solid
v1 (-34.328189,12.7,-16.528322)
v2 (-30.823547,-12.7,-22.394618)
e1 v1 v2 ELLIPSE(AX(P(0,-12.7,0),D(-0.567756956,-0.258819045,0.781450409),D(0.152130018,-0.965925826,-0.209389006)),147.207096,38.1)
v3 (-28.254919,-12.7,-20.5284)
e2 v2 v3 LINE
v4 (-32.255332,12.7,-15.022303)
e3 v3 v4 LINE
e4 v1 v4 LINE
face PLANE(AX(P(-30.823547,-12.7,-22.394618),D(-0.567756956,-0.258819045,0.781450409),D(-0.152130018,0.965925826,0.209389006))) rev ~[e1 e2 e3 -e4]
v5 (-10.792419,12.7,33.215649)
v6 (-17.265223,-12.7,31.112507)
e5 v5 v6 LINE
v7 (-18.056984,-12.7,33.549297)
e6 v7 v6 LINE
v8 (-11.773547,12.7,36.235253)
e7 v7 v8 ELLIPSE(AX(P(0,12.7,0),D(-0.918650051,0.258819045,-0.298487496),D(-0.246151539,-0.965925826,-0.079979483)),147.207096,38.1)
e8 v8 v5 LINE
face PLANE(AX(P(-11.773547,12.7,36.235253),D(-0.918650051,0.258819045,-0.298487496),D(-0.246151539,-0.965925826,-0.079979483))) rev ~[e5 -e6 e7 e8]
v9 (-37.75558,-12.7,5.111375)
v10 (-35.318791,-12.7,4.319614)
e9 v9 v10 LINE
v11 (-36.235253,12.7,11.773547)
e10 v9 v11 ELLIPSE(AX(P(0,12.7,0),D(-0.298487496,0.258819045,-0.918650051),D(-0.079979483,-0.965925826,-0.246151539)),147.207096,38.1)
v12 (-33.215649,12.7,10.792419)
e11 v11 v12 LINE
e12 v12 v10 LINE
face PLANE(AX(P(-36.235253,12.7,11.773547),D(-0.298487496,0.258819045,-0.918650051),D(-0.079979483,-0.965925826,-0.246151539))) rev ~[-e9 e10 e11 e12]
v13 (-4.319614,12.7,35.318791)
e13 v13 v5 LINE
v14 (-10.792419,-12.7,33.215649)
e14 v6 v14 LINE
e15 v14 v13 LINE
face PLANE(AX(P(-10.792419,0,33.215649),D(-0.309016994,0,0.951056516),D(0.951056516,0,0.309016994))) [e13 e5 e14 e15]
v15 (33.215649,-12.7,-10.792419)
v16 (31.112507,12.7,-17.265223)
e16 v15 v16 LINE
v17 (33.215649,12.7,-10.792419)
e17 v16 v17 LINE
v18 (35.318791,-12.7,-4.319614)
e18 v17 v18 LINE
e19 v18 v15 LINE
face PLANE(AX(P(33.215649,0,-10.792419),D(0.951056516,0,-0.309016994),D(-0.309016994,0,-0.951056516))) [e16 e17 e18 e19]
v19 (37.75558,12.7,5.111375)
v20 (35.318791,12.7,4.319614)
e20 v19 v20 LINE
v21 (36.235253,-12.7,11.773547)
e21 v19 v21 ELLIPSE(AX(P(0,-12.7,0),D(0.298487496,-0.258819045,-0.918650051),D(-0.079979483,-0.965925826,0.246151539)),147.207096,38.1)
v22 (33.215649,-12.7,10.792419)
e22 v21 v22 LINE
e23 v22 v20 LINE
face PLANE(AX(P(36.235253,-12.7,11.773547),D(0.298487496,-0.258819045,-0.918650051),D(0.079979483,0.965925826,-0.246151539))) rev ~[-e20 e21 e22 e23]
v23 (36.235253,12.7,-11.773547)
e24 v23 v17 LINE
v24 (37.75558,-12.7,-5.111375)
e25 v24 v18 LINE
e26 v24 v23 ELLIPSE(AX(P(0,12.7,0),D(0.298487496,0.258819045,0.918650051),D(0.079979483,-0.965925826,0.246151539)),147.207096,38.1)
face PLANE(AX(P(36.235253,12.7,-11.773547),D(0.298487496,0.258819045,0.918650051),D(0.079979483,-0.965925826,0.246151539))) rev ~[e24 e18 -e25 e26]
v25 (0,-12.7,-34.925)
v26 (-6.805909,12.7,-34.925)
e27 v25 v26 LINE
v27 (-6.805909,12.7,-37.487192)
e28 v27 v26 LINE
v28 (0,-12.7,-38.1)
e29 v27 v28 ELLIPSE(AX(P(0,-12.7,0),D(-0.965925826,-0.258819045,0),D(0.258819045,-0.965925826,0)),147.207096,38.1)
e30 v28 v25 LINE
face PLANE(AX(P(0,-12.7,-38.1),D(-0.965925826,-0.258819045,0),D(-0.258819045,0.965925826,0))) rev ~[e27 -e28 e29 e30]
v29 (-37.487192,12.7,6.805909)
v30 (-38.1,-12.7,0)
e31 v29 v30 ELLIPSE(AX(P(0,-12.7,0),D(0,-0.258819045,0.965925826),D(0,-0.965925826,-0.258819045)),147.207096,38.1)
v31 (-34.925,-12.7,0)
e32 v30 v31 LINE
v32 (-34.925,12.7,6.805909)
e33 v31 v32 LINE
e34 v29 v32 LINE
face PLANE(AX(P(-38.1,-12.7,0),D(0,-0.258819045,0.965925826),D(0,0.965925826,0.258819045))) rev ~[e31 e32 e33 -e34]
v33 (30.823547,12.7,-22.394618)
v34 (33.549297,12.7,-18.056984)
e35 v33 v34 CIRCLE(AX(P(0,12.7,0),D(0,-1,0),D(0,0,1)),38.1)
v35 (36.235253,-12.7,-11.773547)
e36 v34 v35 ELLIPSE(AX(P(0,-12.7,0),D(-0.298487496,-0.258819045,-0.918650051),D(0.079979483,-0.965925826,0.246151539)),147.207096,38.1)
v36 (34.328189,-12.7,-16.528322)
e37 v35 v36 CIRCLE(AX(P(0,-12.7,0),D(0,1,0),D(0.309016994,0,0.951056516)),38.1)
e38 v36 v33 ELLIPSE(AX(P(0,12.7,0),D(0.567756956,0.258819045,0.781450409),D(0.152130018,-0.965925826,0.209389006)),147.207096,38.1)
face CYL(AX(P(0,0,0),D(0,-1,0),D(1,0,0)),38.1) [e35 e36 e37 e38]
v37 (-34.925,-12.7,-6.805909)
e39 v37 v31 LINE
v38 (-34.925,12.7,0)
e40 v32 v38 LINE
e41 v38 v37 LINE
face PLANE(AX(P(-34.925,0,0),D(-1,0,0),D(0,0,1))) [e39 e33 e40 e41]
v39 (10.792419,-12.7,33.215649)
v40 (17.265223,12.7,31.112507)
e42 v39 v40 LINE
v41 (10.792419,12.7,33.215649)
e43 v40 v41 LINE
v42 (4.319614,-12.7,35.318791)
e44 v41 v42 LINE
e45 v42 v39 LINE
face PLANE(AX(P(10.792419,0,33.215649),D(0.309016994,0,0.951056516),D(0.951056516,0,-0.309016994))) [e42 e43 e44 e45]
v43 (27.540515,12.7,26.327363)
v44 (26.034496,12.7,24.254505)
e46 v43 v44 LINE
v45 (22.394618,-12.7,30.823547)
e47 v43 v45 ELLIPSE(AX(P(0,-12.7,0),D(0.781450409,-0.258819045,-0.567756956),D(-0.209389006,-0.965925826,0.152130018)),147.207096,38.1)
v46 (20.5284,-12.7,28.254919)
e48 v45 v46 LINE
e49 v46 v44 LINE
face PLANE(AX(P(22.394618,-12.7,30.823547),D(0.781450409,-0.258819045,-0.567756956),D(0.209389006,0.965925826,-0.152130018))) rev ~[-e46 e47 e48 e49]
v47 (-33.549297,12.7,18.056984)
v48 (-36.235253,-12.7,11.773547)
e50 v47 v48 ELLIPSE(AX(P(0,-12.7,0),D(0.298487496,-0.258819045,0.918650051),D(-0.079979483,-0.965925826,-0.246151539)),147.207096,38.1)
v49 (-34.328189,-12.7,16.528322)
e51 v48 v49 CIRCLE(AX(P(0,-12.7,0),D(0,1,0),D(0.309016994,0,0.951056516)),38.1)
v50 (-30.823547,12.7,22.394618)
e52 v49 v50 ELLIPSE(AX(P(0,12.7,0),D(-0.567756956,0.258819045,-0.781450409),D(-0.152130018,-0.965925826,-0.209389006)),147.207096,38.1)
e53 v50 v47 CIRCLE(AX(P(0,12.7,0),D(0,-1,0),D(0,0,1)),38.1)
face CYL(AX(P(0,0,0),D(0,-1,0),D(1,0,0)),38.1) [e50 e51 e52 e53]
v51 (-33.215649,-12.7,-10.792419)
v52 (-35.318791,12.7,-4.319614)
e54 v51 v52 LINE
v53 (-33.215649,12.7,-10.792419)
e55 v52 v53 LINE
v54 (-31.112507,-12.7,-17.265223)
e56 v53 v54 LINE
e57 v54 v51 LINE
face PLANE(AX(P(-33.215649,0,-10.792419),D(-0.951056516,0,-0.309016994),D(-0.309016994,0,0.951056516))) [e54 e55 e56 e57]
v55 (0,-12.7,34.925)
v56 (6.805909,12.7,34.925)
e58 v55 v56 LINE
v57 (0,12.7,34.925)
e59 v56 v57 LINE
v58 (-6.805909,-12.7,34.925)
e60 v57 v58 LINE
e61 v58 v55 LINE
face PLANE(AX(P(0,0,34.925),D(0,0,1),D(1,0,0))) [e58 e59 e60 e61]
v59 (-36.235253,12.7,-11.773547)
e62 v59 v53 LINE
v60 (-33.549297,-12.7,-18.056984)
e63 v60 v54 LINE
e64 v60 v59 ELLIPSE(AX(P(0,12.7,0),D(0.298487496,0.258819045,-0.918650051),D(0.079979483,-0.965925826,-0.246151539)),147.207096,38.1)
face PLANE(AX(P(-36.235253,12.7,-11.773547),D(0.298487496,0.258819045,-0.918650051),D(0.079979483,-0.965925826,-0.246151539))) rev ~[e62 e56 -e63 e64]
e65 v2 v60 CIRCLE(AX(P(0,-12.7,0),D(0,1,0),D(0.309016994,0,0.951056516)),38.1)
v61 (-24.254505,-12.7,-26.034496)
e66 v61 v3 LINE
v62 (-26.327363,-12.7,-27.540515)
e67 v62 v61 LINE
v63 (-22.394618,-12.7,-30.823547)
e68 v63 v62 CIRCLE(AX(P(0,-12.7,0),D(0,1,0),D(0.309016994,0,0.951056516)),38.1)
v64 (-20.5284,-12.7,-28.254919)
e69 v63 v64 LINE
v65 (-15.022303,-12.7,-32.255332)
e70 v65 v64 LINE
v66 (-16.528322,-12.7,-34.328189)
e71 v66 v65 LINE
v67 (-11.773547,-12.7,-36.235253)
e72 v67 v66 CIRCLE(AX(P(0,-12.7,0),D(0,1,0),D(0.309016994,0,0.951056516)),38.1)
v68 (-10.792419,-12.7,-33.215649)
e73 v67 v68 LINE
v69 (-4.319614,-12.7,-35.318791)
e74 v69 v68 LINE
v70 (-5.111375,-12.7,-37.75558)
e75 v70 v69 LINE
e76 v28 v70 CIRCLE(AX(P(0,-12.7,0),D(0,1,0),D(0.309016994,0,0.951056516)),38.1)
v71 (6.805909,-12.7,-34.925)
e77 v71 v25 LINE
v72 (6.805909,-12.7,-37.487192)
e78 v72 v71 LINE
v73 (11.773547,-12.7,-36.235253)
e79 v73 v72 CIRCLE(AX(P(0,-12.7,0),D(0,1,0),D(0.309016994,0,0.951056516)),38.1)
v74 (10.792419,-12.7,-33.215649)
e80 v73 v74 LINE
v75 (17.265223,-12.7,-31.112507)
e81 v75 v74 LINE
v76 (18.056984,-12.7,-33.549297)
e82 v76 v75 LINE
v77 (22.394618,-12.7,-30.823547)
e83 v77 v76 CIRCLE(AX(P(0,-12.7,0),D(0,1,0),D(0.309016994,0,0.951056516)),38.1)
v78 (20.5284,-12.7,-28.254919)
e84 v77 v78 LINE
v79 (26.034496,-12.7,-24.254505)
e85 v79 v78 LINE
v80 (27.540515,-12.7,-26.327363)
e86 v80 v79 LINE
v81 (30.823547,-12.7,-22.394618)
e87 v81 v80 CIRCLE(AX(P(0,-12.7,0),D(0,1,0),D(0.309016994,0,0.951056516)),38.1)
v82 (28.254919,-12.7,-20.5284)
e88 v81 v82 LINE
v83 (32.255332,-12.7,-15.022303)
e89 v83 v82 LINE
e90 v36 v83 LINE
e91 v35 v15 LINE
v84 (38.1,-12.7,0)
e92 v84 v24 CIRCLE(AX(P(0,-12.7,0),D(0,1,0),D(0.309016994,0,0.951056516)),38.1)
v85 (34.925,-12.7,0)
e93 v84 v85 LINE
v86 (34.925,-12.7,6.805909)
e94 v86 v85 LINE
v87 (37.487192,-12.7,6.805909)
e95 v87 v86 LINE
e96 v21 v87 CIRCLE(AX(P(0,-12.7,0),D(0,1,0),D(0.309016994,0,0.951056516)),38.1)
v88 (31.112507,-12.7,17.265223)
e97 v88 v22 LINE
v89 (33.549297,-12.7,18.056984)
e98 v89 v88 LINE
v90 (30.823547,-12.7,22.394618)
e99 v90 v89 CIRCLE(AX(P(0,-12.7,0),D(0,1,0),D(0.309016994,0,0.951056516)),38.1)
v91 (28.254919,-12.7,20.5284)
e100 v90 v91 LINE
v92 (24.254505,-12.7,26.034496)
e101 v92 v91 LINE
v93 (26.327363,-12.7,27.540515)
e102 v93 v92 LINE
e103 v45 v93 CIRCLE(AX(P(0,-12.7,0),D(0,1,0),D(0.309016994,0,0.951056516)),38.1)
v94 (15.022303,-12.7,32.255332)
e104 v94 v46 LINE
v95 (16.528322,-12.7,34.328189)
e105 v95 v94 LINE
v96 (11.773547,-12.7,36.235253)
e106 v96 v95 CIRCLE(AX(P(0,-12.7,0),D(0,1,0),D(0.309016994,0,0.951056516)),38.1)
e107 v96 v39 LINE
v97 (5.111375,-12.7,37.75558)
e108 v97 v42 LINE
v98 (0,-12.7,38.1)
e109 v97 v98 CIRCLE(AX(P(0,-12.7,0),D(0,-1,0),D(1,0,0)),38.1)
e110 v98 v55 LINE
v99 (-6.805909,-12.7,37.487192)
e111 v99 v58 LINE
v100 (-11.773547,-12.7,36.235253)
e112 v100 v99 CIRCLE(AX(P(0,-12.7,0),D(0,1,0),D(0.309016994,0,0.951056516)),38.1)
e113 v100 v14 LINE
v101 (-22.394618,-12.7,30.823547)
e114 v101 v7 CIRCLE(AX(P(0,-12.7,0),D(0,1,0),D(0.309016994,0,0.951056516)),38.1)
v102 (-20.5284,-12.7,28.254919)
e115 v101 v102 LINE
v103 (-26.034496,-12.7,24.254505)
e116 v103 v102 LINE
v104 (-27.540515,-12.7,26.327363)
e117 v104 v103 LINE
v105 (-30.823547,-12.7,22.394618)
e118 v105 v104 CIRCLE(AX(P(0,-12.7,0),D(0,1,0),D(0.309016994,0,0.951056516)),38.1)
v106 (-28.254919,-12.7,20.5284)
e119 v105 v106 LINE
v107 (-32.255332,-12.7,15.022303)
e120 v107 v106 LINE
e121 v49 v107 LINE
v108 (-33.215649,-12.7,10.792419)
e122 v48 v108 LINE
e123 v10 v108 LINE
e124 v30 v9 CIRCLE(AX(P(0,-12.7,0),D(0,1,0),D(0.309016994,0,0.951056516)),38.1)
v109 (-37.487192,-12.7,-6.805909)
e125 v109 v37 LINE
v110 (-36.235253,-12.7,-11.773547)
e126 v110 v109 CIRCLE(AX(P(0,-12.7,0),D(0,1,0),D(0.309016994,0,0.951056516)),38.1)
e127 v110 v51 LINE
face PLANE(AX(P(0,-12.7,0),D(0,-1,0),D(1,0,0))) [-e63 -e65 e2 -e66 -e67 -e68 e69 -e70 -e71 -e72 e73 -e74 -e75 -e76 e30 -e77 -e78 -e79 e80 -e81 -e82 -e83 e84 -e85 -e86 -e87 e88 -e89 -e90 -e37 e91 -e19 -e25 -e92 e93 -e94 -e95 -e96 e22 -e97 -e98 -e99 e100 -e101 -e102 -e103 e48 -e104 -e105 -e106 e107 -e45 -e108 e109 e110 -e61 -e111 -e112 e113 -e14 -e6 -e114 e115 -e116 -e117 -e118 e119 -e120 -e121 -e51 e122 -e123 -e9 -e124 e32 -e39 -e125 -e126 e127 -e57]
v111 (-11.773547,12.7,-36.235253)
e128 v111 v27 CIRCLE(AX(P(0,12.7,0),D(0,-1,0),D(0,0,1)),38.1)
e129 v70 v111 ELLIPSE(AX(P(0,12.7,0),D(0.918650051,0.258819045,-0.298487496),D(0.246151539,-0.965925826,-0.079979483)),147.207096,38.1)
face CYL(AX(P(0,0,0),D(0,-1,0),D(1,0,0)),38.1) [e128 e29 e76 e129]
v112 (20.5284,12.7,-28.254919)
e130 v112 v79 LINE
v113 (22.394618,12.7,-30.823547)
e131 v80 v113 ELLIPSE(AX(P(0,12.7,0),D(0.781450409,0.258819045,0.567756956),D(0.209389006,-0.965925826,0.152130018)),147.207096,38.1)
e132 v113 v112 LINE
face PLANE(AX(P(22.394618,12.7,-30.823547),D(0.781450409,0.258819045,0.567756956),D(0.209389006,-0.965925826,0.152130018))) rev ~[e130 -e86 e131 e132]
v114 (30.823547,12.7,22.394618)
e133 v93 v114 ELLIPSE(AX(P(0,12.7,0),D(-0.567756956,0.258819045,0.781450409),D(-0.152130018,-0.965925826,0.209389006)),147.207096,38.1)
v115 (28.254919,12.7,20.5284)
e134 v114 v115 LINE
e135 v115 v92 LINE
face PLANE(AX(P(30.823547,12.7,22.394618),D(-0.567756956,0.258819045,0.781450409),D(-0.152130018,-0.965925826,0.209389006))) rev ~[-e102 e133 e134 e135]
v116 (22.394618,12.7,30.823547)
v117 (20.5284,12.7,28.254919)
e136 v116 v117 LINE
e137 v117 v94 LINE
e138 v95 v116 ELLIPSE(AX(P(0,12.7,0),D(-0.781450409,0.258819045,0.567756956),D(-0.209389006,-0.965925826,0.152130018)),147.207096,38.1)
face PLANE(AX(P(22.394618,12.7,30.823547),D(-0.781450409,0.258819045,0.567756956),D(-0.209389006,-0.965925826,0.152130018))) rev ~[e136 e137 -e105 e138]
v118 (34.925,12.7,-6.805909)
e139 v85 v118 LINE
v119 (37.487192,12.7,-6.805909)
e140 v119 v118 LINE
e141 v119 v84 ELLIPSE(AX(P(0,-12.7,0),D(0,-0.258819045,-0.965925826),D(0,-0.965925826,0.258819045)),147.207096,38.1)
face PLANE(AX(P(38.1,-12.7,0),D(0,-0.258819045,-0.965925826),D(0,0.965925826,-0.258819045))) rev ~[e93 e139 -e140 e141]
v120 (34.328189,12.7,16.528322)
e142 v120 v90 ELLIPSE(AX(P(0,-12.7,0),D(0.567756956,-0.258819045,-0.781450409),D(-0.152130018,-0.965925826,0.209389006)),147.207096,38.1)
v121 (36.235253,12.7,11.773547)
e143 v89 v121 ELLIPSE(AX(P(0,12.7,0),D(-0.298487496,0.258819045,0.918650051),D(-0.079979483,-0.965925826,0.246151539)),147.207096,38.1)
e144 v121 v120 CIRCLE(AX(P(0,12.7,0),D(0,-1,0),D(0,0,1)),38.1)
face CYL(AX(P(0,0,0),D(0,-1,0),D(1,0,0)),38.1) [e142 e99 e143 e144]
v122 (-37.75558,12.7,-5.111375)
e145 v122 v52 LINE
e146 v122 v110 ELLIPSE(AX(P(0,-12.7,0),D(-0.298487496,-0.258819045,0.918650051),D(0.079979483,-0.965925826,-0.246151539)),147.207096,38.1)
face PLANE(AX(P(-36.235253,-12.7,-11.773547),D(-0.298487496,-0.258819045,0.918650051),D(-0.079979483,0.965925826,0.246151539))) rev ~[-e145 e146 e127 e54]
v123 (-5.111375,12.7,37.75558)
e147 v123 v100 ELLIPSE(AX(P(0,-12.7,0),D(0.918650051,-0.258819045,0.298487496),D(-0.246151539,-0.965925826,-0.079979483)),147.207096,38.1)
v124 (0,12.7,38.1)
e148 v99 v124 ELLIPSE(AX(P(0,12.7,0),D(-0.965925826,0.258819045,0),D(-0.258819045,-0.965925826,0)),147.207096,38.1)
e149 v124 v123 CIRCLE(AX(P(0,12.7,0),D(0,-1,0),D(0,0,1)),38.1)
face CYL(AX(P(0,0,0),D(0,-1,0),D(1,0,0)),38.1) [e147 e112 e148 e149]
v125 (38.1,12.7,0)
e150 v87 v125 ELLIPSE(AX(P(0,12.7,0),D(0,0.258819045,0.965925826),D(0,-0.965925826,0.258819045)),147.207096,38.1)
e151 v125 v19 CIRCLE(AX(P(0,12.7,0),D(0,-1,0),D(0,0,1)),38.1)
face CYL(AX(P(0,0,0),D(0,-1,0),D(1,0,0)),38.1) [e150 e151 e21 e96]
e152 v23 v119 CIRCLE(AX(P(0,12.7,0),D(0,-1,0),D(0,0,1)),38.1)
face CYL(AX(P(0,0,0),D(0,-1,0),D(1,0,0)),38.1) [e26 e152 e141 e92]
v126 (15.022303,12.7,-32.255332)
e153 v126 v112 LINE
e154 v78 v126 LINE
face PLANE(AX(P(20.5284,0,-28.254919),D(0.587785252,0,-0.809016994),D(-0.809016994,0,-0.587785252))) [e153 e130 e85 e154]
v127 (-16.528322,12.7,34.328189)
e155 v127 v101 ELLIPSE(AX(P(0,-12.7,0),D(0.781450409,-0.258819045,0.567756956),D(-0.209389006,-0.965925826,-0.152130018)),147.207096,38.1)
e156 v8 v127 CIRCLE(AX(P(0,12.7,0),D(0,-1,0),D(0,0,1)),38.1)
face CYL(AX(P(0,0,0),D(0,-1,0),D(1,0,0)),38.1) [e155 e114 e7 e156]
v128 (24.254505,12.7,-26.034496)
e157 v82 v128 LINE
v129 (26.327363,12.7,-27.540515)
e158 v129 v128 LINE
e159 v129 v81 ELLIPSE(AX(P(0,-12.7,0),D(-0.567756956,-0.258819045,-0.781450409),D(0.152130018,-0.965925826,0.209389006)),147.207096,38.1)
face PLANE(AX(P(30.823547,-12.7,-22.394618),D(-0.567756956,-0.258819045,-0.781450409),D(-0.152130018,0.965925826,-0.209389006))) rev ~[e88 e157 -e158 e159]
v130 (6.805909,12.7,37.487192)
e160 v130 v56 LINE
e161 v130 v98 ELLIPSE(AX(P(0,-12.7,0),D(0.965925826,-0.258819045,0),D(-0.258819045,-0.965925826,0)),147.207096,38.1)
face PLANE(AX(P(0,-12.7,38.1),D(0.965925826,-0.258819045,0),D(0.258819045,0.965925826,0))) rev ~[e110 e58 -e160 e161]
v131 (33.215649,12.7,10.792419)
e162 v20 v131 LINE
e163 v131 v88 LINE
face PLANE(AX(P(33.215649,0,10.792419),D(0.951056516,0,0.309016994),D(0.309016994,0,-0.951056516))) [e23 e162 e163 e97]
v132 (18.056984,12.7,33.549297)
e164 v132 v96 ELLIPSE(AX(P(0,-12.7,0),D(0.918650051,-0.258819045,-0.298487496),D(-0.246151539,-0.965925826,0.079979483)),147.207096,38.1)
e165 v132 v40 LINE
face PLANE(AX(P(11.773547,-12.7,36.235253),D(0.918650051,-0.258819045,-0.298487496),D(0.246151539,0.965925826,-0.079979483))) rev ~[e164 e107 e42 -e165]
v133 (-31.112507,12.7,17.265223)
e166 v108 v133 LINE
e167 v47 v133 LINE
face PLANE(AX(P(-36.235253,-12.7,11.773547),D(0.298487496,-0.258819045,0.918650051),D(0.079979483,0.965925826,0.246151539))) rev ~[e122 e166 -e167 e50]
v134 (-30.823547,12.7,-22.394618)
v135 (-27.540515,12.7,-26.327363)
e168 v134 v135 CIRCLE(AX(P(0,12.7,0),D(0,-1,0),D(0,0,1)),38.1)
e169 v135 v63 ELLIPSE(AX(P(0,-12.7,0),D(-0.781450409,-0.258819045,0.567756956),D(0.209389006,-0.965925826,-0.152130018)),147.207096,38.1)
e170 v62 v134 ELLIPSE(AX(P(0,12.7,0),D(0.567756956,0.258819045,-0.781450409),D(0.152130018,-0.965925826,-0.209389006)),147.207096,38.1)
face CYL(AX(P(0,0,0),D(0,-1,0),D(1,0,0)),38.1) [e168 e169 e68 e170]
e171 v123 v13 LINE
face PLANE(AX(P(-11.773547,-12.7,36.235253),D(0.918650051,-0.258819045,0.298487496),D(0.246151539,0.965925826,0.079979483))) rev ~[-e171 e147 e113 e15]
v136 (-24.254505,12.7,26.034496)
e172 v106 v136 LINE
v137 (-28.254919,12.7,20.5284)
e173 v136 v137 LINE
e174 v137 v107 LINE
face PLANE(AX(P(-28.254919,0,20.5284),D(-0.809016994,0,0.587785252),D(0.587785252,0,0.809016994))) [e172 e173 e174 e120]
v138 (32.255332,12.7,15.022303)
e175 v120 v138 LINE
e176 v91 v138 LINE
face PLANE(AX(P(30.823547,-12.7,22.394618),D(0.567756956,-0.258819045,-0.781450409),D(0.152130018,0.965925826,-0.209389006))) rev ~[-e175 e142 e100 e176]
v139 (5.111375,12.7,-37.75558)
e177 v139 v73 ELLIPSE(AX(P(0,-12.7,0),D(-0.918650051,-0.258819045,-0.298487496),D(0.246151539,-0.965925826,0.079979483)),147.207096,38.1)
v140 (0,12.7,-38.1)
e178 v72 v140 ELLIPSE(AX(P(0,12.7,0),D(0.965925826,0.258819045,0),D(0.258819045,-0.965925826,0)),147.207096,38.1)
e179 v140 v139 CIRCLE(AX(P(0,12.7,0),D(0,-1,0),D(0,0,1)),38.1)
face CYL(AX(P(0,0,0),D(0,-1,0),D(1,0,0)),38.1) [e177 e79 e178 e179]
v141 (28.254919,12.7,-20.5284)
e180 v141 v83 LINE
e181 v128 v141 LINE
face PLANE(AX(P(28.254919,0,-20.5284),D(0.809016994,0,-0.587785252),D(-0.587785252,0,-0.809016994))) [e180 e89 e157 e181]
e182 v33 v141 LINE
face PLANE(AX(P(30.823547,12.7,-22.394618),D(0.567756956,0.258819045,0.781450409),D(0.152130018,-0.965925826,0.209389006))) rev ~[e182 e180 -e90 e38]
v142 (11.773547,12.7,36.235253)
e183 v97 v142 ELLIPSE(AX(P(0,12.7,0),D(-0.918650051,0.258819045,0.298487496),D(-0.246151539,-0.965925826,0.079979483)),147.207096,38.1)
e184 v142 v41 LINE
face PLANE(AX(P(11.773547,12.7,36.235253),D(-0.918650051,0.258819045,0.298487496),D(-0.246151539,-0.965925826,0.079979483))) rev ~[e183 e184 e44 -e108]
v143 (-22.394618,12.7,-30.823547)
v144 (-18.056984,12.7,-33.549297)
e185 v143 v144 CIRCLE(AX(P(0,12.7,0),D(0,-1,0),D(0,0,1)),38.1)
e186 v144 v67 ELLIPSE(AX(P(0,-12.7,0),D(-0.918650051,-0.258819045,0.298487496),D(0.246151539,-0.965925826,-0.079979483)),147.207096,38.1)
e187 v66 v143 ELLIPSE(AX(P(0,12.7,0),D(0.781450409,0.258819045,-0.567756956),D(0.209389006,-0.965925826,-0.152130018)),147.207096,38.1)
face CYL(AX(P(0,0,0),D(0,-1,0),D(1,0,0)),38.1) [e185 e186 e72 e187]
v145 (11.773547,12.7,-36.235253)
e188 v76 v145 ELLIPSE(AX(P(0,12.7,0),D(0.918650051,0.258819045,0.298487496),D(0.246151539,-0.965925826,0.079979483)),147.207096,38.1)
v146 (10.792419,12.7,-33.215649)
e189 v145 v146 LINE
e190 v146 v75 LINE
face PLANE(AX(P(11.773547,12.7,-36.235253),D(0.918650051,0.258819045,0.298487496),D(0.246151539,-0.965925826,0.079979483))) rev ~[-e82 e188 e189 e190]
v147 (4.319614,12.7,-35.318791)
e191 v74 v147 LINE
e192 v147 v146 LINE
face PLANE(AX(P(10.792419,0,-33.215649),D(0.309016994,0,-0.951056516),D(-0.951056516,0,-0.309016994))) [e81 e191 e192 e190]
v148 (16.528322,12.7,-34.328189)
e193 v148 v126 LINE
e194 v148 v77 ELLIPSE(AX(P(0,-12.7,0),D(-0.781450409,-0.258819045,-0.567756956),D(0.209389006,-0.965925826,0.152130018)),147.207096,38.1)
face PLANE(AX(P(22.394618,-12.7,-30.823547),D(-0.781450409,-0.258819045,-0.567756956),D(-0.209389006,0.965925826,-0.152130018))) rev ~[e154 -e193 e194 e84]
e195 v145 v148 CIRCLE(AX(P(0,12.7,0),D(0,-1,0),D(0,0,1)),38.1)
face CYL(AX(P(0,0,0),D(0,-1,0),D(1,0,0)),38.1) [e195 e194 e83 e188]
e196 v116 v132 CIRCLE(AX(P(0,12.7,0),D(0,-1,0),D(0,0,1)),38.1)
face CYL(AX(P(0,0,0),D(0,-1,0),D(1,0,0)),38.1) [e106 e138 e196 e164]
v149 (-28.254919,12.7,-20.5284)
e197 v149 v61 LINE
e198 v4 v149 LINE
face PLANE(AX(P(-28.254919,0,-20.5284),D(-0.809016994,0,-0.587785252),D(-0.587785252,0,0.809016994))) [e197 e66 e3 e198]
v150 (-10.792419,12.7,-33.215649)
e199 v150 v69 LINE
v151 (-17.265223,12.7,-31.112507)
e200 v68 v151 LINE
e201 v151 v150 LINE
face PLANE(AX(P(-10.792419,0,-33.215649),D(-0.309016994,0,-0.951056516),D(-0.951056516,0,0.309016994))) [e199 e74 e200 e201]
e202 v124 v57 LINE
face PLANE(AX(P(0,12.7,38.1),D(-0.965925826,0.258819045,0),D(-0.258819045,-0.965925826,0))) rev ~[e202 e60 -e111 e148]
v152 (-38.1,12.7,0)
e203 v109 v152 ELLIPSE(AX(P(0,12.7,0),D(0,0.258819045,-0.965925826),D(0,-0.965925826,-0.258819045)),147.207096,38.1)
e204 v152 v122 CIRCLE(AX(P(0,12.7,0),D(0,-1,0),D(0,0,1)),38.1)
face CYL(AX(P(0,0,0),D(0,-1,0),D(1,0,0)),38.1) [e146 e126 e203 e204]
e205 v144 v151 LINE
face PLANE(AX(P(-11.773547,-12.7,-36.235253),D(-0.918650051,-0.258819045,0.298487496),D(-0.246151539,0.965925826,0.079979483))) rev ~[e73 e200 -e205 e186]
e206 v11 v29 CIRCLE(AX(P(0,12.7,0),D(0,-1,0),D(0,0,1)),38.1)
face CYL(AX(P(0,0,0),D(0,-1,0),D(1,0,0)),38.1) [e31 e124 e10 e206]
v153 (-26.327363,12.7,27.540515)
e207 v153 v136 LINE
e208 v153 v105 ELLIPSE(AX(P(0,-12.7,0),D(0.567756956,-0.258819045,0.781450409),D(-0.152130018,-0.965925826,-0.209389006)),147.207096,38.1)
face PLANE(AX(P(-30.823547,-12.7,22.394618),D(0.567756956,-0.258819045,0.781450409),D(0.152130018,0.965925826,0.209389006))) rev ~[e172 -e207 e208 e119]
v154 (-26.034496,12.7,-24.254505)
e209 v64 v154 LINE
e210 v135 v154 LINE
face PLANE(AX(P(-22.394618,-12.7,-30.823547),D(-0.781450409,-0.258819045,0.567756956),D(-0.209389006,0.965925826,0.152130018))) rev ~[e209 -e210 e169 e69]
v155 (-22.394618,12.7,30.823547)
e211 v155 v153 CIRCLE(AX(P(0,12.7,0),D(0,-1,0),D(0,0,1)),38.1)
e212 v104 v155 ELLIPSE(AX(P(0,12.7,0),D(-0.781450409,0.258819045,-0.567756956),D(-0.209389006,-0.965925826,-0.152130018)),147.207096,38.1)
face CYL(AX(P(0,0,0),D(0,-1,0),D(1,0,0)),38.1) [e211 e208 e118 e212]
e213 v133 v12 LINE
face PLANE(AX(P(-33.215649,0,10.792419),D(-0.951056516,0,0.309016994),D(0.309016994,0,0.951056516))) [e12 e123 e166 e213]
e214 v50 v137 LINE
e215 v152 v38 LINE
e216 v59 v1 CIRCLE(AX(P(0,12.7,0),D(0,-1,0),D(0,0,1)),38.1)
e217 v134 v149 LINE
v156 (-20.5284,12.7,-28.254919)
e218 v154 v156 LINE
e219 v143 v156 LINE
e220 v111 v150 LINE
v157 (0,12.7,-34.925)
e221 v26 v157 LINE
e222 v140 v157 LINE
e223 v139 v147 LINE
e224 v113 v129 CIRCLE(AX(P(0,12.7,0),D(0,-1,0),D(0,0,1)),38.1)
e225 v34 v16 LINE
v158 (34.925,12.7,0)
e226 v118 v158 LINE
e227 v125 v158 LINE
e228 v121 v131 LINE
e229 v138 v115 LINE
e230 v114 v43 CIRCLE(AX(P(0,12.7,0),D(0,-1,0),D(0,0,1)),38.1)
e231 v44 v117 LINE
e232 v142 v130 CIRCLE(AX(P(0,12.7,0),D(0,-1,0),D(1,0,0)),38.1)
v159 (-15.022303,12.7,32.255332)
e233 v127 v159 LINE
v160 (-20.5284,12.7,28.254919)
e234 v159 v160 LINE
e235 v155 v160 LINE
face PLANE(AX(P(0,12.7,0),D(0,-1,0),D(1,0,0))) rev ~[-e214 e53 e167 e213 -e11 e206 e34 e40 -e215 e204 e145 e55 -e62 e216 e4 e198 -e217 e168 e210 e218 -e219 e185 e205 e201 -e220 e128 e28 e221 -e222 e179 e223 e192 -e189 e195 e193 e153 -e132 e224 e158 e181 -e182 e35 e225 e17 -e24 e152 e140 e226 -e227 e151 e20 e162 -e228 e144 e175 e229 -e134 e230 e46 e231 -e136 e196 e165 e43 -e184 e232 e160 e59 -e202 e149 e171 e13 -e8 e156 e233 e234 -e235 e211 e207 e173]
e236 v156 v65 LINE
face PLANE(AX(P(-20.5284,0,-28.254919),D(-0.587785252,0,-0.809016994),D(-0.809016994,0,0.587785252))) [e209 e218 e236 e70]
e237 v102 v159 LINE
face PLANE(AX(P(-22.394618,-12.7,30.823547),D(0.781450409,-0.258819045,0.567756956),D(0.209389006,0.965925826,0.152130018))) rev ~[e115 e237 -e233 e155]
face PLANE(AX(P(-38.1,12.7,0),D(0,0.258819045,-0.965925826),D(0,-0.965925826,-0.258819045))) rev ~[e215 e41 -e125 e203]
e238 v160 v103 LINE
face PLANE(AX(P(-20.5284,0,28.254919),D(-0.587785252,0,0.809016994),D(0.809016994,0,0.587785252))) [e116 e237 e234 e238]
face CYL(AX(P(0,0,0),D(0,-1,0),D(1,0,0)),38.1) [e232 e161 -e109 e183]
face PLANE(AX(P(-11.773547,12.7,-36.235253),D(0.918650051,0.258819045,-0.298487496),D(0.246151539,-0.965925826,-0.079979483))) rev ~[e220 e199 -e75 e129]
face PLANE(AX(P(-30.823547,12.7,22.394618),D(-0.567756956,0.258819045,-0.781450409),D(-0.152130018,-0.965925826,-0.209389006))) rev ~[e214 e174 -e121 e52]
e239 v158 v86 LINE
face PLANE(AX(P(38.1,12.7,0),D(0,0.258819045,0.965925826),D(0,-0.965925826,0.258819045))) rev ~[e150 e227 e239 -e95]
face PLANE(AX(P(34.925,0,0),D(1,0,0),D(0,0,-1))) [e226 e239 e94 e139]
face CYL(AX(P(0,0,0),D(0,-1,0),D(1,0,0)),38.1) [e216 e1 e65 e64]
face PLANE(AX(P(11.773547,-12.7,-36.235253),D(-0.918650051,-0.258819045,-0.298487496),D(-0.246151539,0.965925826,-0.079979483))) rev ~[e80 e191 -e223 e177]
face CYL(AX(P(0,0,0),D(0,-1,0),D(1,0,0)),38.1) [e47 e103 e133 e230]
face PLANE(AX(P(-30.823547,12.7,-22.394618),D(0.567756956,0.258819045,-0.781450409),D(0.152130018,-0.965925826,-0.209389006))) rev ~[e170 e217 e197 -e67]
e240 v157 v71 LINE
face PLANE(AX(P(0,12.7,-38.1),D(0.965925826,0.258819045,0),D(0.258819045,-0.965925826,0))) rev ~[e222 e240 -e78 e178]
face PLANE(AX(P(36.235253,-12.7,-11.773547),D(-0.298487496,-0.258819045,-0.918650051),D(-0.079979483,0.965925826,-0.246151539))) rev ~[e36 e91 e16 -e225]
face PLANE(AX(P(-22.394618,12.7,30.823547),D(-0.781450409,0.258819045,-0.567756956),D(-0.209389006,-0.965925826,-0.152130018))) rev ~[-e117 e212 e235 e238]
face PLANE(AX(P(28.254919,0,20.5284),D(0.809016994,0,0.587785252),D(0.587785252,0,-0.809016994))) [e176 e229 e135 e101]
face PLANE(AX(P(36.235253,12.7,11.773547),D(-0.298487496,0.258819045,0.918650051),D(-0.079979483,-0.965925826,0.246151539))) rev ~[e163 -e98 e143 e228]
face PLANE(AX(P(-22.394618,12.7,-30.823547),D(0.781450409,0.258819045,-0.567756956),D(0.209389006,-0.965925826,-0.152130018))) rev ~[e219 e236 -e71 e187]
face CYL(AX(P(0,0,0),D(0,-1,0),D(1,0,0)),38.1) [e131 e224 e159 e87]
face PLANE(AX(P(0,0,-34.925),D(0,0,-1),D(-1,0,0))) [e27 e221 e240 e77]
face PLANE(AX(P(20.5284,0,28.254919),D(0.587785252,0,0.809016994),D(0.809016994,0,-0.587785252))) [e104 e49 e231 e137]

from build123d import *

# Parameters (mm, degrees)
F0_R            = 38.1
F1_DEPTH        = 12.7
F4_DEPTH        = 3.175
F4_COPIES_COUNT = 20


# Not quite as in the source:
# - a pattern or mirror of a feature is missing from the dataset's text; its kind, count and spacing are read off the source's solid


with BuildPart() as f1:
    # F0 (on Front) → F1 (new body, symmetric)
    with BuildSketch(Plane.XZ):
        Circle(F0_R)
    extrude(amount=F1_DEPTH, both=True)

    # F3 (on offset) → F4 (cut)
    with BuildSketch(Plane.XY.offset(38.1)):
        Polygon((-6.8059094878, -12.7), (0, -12.7), (6.8059094878, 12.7), (0, 12.7), align=None)
    f4 = extrude(amount=-F4_DEPTH, mode=Mode.SUBTRACT)

    # F4_copies: F4 ×20 about axis
    f4_copies_axis = Axis((0, 0, 0), (0, 1, 0))
    for i in range(1, F4_COPIES_COUNT):
        add(f4.rotate(f4_copies_axis, i * 360 / F4_COPIES_COUNT), mode=Mode.SUBTRACT)


solid = f1.part
